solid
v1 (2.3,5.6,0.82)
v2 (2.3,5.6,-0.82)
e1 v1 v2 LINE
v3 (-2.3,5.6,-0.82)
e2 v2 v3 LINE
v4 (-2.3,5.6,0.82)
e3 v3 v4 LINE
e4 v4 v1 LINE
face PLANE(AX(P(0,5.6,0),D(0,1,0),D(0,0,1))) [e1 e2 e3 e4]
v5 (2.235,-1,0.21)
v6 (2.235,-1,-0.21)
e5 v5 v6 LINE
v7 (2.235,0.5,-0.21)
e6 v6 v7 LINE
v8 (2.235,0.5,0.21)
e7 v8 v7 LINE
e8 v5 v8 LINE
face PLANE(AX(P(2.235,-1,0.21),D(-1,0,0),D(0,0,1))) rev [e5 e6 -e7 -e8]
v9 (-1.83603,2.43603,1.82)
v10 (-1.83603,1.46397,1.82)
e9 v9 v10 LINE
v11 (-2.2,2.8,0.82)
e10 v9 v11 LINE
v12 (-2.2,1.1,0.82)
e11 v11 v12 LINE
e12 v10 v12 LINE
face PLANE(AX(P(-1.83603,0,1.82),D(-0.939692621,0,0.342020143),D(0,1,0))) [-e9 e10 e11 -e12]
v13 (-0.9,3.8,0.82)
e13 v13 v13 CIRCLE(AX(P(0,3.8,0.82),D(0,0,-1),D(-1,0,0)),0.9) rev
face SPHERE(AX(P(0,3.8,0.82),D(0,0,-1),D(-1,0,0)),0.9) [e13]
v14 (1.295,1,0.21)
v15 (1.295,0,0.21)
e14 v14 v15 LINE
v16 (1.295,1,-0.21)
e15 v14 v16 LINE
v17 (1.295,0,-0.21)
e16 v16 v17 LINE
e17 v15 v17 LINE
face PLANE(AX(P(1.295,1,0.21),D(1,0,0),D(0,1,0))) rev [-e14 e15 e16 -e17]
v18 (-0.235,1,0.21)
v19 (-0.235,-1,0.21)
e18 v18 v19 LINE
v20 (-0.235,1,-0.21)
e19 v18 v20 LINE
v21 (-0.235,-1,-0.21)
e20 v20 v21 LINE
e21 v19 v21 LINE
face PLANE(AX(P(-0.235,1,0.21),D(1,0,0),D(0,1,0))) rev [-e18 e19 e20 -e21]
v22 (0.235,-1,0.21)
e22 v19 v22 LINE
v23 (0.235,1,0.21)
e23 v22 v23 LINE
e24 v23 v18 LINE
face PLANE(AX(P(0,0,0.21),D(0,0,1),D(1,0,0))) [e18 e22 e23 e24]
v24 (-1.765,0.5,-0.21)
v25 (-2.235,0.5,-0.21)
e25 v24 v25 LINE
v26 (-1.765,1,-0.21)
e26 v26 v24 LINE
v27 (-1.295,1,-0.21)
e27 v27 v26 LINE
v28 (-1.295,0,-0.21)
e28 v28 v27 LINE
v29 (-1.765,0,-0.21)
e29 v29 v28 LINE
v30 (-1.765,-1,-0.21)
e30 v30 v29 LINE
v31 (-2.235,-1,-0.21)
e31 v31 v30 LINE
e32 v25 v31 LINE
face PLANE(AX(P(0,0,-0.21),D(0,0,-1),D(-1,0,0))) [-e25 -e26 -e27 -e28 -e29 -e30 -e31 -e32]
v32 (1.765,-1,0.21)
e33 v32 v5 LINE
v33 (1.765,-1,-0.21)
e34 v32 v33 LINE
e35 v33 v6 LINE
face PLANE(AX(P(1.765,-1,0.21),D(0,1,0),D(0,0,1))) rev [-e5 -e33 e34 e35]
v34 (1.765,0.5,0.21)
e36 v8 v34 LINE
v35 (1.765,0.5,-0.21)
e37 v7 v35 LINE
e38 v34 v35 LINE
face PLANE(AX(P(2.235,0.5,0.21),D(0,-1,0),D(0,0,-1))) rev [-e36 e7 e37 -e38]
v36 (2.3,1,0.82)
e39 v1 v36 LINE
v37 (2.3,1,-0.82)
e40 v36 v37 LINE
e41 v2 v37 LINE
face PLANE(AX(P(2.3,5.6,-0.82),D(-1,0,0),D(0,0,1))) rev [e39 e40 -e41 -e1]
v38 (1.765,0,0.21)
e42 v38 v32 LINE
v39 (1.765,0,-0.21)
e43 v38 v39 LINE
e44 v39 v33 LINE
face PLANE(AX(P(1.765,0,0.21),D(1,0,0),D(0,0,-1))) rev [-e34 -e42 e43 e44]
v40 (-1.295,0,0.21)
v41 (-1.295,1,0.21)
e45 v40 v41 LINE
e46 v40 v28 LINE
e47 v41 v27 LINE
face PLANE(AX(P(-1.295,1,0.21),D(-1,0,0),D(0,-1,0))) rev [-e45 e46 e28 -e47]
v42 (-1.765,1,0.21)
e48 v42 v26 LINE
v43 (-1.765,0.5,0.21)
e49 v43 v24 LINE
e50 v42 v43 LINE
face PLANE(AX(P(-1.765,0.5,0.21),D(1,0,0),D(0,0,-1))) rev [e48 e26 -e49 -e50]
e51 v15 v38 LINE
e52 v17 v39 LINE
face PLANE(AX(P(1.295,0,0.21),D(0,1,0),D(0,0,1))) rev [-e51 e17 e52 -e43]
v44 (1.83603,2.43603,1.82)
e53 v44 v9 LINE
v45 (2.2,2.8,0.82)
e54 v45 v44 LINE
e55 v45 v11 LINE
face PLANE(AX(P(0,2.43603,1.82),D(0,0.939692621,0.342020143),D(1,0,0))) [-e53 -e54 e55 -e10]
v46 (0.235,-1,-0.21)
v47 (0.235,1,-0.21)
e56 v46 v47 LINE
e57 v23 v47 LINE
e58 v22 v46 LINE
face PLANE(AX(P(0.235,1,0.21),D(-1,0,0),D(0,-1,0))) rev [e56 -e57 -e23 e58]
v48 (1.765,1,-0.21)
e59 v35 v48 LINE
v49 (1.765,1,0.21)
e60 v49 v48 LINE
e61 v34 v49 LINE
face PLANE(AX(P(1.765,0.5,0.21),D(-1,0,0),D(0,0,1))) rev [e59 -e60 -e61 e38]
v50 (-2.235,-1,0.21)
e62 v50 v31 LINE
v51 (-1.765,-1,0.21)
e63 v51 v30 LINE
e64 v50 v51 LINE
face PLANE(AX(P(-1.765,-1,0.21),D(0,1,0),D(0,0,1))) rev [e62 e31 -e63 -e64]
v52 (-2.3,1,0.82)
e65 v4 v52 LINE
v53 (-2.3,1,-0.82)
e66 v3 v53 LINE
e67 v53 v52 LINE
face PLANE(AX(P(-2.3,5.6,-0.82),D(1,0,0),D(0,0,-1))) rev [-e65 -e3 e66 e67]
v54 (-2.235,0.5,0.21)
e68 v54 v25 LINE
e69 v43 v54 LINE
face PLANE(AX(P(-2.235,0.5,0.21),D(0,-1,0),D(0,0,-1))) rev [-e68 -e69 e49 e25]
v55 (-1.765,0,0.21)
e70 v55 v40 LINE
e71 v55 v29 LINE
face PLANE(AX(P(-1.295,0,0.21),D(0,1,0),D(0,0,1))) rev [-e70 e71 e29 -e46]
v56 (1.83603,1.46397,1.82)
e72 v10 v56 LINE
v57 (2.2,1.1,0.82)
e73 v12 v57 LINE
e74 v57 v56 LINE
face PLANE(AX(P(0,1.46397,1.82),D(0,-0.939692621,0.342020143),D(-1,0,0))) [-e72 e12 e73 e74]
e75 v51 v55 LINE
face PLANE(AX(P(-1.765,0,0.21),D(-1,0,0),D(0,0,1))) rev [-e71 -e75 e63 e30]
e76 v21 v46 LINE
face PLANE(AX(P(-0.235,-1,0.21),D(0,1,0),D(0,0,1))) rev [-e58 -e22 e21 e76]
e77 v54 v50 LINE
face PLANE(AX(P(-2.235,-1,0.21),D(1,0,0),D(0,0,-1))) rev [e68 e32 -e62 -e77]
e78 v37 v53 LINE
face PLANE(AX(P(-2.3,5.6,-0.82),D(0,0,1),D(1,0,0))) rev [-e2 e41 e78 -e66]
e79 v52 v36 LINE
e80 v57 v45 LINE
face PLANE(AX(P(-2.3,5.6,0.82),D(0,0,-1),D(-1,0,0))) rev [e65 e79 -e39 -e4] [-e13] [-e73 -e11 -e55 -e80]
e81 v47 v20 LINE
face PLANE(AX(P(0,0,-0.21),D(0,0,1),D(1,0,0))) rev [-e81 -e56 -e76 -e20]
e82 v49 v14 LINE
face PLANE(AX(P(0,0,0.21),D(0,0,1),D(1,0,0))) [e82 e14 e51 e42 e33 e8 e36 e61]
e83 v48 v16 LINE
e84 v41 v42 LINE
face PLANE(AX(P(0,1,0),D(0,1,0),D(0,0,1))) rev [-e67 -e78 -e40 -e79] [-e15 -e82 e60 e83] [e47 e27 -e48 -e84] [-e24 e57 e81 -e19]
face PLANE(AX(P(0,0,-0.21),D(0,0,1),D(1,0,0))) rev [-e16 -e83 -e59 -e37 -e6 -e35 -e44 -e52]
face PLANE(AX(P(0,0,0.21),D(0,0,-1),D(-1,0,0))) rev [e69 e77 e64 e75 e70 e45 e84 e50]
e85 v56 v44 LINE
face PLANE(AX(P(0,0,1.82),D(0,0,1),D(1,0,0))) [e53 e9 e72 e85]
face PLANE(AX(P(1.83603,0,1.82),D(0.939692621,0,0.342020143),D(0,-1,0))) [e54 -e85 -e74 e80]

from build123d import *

# Parameters (mm, degrees)
BOSS_EXTRUDE1_DEPTH   = 0.21
SKETCH1_W             = 0.47
SKETCH1_H             = 2
BOSS_EXTRUDE1_2_DEPTH = 0.21
BOSS_EXTRUDE1_3_DEPTH = 0.21
SKETCH2_W             = 4.6
SKETCH2_H             = 1.64
BOSS_EXTRUDE2_DEPTH   = 4.6
REVOLVE1_ANGLE        = 180
SKETCH4_W             = 4.4
SKETCH4_H             = 1.7
BOSS_EXTRUDE3_DEPTH   = 1
CHAMFER1_SIZE         = 1
CHAMFER1_SIZE_2       = 0.363970234


with BuildPart() as part:
    # Sketch1 → Boss-Extrude1 (new, symmetric)
    with BuildSketch(Plane.XY):
        Polygon((-1.295, 1), (-1.295, 0), (-1.765, 0), (-1.765, -1), (-2.235, -1), (-2.235, 0.5), (-1.765, 0.5), (-1.765, 1), align=None)
    extrude(amount=BOSS_EXTRUDE1_DEPTH, both=True)



with BuildPart() as body_2:
    # Sketch1 → Boss-Extrude1 2 (new, symmetric)
    with BuildSketch(Plane.XY):
        Rectangle(SKETCH1_W, SKETCH1_H)
    extrude(amount=BOSS_EXTRUDE1_2_DEPTH, both=True)


with BuildPart() as body_3:
    # Sketch1 → Boss-Extrude1 3 (new, symmetric)
    with BuildSketch(Plane.XY):
        Polygon((1.765, 1), (1.295, 1), (1.295, 0), (1.765, 0), (1.765, -1), (2.235, -1), (2.235, 0.5), (1.765, 0.5), align=None)
    extrude(amount=BOSS_EXTRUDE1_3_DEPTH, both=True)


with BuildPart() as part_1:
    add(part.part)

    add(body_2.part)  # Boss-Extrude2 merges body 2

    add(body_3.part)  # Boss-Extrude2 merges body 3
    # Sketch2 → Boss-Extrude2 (add)
    with BuildSketch(Plane(origin=(0, 1, 0), x_dir=(1, 0, 0), z_dir=(0, 1, 0))):
        Rectangle(SKETCH2_W, SKETCH2_H)
    extrude(amount=BOSS_EXTRUDE2_DEPTH)

    # Sketch3 → Revolve1 (revolve)
    with BuildSketch(Plane.XY.offset(0.82)):
        with BuildLine():
            Line((0, 4.7), (0, 2.9))
            ThreePointArc((0, 2.9), (0.9, 3.8), (0, 4.7))
        make_face()
    revolve(axis=Axis((0, 4.7, 0.82), (0, -1, 0)), revolution_arc=REVOLVE1_ANGLE)

    # Sketch4 → Boss-Extrude3 (add)
    with BuildSketch(Plane.XY.offset(0.82)):
        with Locations((0, 1.95)):
            Rectangle(SKETCH4_W, SKETCH4_H)
    extrude(amount=BOSS_EXTRUDE3_DEPTH)

    # Chamfer1
    # the kernel refuses this chamfer: 1, 0.363970234 mm, written as the material it takes off along each edge
    with BuildSketch(Plane(origin=(4.794194733, 1.1, 1.82), x_dir=(0, -0.013184058198646006, -0.9999130865277315), z_dir=(-1, 0, 0))) as chamfer1_piece_1_section:
        Polygon((CHAMFER1_SIZE * 0.999913086528, -CHAMFER1_SIZE * 0.0131840581986), (-CHAMFER1_SIZE_2 * 0.0131840582083, -CHAMFER1_SIZE_2 * 0.999913087259), (0, 0), align=None)
    chamfer1_piece_1 = extrude(amount=9.588389465, mode=Mode.PRIVATE)
    chamfer1_piece_1 = split(chamfer1_piece_1, bisect_by=Plane(origin=(0, 1.212526608, 0.82), z_dir=(0, 0, 1)), keep=Keep.TOP, mode=Mode.PRIVATE)
    add(chamfer1_piece_1, mode=Mode.SUBTRACT)
    with BuildSketch(Plane(origin=(-2.2, -1.494194733, 1.82), x_dir=(-0.013184058198646006, 0, -0.9999130865277315), z_dir=(0, 1, 0))) as chamfer1_piece_2_section:
        Polygon((CHAMFER1_SIZE * 0.999913086528, -CHAMFER1_SIZE * 0.0131840581986), (-CHAMFER1_SIZE_2 * 0.0131840582083, -CHAMFER1_SIZE_2 * 0.999913087259), (0, 0), align=None)
    chamfer1_piece_2 = extrude(amount=6.888389465, mode=Mode.PRIVATE)
    chamfer1_piece_2 = split(chamfer1_piece_2, bisect_by=Plane(origin=(-2.087473392, 1.95, 0.82), z_dir=(0, 0, 1)), keep=Keep.TOP, mode=Mode.PRIVATE)
    add(chamfer1_piece_2, mode=Mode.SUBTRACT)
    with BuildSketch(Plane(origin=(2.2, 5.394194733, 1.82), x_dir=(0.013184058198646006, 0, -0.9999130865277315), z_dir=(0, -1, 0))) as chamfer1_piece_3_section:
        Polygon((CHAMFER1_SIZE * 0.999913086528, -CHAMFER1_SIZE * 0.0131840581986), (-CHAMFER1_SIZE_2 * 0.0131840582083, -CHAMFER1_SIZE_2 * 0.999913087259), (0, 0), align=None)
    chamfer1_piece_3 = extrude(amount=6.888389465, mode=Mode.PRIVATE)
    chamfer1_piece_3 = split(chamfer1_piece_3, bisect_by=Plane(origin=(2.087473392, 1.95, 0.82), z_dir=(0, 0, 1)), keep=Keep.TOP, mode=Mode.PRIVATE)
    add(chamfer1_piece_3, mode=Mode.SUBTRACT)
    with BuildSketch(Plane(origin=(-4.794194733, 2.8, 1.82), x_dir=(0, 0.013184058198646006, -0.9999130865277315), z_dir=(1, 0, 0))) as chamfer1_piece_4_section:
        Polygon((CHAMFER1_SIZE * 0.999913086528, -CHAMFER1_SIZE * 0.0131840581986), (-CHAMFER1_SIZE_2 * 0.0131840582083, -CHAMFER1_SIZE_2 * 0.999913087259), (0, 0), align=None)
    chamfer1_piece_4 = extrude(amount=9.588389465, mode=Mode.PRIVATE)
    chamfer1_piece_4 = split(chamfer1_piece_4, bisect_by=Plane(origin=(0, 2.687473392, 0.82), z_dir=(0, 0, 1)), keep=Keep.TOP, mode=Mode.PRIVATE)
    add(chamfer1_piece_4, mode=Mode.SUBTRACT)


solid = part_1.part
